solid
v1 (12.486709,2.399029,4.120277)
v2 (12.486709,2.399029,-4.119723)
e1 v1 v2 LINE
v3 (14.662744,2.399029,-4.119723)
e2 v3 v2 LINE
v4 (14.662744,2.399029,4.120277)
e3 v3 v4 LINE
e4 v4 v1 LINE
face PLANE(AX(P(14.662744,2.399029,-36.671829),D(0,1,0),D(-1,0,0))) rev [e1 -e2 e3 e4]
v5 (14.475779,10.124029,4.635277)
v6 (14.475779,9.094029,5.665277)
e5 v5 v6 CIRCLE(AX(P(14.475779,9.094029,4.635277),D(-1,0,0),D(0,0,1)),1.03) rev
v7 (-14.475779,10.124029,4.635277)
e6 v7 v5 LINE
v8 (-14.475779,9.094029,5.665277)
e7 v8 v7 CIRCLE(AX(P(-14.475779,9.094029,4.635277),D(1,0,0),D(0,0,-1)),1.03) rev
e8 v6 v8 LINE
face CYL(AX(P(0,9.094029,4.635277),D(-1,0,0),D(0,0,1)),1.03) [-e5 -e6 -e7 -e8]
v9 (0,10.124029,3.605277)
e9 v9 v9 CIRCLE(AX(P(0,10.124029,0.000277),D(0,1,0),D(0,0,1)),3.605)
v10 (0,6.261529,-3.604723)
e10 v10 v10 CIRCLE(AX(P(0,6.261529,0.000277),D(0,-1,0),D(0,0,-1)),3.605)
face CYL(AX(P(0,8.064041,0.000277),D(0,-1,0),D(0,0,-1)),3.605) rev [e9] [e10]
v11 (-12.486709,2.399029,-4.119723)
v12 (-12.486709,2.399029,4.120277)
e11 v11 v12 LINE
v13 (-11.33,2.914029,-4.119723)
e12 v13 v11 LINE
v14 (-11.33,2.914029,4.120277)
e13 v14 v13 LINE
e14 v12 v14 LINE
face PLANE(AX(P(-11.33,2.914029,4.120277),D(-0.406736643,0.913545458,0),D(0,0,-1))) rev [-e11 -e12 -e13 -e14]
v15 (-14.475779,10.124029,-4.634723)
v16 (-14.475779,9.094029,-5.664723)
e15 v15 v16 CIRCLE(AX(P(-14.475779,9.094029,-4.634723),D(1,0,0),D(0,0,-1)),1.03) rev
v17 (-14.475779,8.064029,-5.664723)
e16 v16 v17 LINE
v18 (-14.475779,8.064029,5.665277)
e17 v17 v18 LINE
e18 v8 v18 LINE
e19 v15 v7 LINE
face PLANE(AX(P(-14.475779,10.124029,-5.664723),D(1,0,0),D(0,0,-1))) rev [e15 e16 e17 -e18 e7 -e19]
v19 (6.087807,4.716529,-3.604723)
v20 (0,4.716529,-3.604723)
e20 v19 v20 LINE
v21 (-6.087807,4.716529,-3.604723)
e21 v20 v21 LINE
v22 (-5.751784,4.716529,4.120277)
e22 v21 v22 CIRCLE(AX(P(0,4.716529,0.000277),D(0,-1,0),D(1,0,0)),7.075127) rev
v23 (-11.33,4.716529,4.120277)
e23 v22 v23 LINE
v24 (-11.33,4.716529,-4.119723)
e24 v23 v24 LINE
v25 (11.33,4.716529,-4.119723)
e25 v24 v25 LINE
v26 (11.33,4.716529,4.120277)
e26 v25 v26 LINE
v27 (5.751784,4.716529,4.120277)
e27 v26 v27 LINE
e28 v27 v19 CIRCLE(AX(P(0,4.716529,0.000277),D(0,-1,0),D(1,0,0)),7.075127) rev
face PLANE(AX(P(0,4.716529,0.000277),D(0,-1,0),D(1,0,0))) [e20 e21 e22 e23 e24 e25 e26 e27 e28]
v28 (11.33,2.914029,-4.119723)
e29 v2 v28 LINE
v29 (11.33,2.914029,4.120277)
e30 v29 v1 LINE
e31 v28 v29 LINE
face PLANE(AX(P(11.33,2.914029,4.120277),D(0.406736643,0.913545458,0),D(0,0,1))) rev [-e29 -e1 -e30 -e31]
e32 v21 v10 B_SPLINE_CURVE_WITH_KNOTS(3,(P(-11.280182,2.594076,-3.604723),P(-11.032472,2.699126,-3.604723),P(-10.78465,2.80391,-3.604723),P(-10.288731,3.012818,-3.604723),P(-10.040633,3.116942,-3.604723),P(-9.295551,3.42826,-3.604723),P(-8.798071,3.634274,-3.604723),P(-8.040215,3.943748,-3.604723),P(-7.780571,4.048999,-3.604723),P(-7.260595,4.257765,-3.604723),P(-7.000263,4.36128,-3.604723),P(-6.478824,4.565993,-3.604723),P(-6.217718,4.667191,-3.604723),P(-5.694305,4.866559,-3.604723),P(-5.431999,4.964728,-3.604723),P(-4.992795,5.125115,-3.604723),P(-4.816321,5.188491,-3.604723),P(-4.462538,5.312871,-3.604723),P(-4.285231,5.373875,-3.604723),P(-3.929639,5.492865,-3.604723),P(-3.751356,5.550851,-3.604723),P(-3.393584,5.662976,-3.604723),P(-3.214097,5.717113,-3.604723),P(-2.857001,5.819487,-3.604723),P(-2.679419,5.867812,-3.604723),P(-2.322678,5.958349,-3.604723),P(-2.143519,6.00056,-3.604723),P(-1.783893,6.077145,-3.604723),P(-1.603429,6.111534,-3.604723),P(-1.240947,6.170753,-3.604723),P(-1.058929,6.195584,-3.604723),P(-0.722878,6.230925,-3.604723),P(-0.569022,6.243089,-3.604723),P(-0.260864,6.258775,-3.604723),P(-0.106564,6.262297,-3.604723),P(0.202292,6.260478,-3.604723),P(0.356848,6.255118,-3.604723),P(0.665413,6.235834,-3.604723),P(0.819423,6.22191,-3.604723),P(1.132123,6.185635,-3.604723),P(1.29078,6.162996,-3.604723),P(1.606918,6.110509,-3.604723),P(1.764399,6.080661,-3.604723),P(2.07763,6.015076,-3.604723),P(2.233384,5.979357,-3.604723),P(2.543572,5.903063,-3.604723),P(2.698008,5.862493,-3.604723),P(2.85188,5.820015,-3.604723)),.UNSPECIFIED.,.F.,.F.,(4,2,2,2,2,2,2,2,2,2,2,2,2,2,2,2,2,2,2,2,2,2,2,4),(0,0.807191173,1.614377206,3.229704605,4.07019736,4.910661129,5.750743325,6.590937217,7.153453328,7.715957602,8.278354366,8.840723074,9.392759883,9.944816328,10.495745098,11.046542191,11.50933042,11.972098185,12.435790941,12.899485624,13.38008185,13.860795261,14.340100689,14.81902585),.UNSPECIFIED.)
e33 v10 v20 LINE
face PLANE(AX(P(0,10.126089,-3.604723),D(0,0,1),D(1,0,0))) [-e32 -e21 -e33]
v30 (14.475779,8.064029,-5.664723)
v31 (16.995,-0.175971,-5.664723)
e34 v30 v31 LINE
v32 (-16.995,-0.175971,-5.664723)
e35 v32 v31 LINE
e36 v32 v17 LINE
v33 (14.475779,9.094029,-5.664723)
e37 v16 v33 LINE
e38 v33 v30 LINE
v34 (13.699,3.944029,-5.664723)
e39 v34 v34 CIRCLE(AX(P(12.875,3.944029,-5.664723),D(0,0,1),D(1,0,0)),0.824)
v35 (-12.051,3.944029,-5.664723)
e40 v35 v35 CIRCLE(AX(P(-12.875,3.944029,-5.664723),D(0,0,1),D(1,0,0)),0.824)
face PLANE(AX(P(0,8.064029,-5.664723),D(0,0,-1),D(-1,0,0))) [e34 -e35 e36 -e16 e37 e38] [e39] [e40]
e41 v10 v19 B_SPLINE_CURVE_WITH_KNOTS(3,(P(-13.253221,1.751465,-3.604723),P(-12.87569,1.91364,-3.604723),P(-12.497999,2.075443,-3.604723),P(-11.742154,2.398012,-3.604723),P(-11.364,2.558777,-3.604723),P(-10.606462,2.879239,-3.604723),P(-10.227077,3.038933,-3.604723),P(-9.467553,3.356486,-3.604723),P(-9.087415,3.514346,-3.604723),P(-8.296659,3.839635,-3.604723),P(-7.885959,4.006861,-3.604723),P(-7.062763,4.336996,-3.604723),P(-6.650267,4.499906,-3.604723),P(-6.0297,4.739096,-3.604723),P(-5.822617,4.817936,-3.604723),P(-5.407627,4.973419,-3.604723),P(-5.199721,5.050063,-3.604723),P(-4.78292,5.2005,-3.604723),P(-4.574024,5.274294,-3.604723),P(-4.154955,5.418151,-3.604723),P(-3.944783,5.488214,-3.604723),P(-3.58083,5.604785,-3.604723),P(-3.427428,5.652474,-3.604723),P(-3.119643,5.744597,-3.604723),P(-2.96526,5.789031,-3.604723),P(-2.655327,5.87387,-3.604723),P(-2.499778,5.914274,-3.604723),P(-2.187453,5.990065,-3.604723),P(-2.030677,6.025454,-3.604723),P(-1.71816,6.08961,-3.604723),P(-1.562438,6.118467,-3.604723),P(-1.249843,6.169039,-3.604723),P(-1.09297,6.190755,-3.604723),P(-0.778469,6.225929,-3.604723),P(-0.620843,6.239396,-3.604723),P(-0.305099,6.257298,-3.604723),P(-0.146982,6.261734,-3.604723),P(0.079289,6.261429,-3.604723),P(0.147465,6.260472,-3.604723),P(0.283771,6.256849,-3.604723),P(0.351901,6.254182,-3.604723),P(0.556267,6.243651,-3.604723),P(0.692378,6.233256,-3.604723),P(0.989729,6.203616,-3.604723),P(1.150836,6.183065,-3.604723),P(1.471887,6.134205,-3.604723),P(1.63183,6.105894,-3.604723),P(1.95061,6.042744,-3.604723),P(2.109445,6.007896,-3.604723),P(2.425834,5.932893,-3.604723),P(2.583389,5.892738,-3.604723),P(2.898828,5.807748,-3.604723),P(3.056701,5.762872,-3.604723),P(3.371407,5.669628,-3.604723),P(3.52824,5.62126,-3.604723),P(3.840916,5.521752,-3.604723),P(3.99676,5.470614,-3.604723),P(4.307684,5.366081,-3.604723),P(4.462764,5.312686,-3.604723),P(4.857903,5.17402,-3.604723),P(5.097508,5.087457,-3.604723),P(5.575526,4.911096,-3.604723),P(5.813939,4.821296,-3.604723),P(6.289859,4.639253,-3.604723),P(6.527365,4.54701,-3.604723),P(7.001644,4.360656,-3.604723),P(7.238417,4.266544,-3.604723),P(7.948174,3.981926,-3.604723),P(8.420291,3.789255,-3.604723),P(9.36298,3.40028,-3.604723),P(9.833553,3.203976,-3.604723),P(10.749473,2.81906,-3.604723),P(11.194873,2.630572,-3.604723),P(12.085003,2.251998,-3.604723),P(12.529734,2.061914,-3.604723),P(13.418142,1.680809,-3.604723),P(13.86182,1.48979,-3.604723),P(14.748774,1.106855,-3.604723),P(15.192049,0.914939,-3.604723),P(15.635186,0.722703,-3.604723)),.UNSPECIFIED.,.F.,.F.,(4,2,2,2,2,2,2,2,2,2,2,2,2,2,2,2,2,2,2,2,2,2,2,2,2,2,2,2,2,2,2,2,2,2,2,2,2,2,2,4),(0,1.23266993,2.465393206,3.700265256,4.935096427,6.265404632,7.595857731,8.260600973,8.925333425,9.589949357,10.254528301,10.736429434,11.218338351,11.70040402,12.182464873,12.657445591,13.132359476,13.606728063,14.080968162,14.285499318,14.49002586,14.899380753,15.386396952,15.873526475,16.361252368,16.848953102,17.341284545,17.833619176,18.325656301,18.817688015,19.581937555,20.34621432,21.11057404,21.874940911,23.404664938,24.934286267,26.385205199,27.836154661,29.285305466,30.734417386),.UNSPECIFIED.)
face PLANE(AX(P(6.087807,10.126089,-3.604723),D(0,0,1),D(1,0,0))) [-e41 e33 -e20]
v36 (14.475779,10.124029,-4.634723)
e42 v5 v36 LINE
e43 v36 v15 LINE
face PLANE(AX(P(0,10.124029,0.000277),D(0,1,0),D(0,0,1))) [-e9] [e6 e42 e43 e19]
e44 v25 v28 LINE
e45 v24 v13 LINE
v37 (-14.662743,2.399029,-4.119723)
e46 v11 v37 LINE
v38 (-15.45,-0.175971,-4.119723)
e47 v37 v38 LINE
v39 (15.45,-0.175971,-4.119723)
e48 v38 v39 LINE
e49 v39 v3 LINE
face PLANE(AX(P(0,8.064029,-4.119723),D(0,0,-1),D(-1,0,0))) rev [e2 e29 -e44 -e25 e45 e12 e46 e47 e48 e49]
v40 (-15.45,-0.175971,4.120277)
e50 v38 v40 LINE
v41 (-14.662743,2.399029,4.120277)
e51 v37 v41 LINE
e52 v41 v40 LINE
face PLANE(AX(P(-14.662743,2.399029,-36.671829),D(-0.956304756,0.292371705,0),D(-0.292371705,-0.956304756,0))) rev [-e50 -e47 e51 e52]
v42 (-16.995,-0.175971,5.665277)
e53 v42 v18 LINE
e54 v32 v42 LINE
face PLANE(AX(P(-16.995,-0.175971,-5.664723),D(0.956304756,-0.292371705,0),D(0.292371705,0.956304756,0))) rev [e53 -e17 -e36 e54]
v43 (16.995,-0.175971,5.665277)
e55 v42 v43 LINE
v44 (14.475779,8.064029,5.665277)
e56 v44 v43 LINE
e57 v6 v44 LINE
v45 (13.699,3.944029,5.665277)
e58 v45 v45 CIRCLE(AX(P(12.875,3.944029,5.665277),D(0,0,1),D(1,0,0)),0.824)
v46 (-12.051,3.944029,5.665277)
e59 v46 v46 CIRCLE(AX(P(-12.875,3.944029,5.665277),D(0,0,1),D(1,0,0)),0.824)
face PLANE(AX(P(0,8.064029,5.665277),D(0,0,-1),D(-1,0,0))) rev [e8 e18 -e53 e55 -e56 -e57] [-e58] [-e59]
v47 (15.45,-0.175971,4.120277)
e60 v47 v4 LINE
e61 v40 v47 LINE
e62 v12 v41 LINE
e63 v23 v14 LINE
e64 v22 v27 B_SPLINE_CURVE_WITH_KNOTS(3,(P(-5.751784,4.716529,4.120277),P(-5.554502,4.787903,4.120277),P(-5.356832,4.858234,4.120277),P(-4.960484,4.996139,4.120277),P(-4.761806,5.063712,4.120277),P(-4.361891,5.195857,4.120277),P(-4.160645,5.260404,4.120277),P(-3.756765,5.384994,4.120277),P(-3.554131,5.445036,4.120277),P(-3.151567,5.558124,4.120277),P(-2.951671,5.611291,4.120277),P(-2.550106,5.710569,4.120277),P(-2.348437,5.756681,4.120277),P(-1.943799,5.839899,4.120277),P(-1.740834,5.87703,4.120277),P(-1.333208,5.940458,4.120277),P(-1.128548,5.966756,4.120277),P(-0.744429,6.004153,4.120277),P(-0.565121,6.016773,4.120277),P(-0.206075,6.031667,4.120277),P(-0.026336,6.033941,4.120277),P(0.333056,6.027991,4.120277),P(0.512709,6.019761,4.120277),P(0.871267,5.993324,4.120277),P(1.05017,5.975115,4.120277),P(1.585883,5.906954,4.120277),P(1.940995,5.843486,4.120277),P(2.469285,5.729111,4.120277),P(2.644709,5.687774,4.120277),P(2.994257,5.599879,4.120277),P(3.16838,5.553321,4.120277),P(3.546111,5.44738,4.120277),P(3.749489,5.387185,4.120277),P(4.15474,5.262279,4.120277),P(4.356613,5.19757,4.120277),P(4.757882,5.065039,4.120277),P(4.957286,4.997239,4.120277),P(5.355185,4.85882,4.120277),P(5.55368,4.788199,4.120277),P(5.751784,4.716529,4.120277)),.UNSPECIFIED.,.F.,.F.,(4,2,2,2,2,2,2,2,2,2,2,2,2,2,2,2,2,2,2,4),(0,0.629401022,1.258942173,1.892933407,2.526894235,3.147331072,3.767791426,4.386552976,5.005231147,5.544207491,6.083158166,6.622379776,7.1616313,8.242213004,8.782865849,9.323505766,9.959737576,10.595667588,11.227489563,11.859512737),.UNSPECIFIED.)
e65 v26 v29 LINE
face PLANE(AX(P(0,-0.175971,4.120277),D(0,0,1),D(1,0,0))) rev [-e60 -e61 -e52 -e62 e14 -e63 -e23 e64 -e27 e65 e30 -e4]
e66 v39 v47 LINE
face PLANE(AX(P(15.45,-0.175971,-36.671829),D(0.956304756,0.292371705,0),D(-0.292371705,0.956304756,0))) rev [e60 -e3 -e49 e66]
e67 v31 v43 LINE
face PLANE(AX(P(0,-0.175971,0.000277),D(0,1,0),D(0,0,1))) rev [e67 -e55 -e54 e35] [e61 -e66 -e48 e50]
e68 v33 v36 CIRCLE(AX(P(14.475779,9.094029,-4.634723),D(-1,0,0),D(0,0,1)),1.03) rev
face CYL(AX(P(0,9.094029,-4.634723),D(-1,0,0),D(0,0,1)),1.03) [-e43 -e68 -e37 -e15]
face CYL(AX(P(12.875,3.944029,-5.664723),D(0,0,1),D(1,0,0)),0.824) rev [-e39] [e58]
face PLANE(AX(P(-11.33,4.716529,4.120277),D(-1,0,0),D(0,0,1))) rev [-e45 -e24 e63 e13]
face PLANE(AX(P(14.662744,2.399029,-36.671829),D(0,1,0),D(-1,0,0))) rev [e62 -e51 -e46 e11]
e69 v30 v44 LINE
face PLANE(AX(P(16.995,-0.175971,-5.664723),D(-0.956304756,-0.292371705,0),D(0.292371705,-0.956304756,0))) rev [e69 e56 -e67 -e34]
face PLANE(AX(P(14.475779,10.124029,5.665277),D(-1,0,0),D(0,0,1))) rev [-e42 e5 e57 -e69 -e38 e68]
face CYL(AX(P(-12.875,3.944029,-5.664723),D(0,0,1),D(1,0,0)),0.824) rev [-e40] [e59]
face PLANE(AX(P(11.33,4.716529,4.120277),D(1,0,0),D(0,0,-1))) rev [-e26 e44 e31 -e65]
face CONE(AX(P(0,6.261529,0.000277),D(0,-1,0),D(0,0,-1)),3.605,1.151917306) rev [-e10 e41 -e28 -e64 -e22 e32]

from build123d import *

# Parameters (mm, degrees)
SKETCH1_W                      = 33
SKETCH1_H                      = 11
SKETCH1_W_2                    = 30
SKETCH1_H_2                    = 8
BOSS_EXTRUDE1_DEPTH            = 8
SKETCH3_R                      = 0.8
CUT_EXTRUDE3_DEPTH             = 22.38340478
CUT_EXTRUDE5_REACH             = 21.144
SKETCH5_R                      = 3.5
CUT_EXTRUDE5_DIRECTION_2_DEPTH = 20.144189719
CUT_EXTRUDE4_DEPTH             = 22.38340478
CUT_EXTRUDE9_START             = -1.5
CUT_EXTRUDE9_DEPTH             = 8
SKETCH9_W                      = 22
SKETCH9_H                      = 8
CUT_EXTRUDE8_DEPTH             = 2.25
BOSS_EXTRUDE8_START            = 2
SKETCH12_W                     = 28.108309096
SKETCH12_H                     = 11
SKETCH12_R                     = 3.5
BOSS_EXTRUDE8_DEPTH            = 2
FILLET1_R                      = 1
CHAMFER1_SIZE                  = 1.5
CHAMFER1_SIZE_2                = 3.369055161
CHAMFER2_SIZE                  = 0.5
CHAMFER2_SIZE2                 = 1.123018387
CHAMFER3_SIZE                  = 0.5
CHAMFER3_SIZE2                 = 1.123018387
BOSS_EXTRUDE9_REACH            = 20.168
HEAT_SHRINK_OFFSET_SCALE_SCALE = 1.03


with BuildPart() as part:
    # Sketch1 → Boss-Extrude1 (new body)
    # profile 1 of 2: a face of its own
    with BuildSketch(Plane(origin=(0, 0, 0), x_dir=(1, 0, 0), z_dir=(0, 1, 0))):
        Rectangle(SKETCH1_W, SKETCH1_H)
        Rectangle(SKETCH1_W_2, SKETCH1_H_2, mode=Mode.SUBTRACT)
    # profile 2 of 2: a face of its own
    with BuildSketch(Plane(origin=(0, 0, 0), x_dir=(1, 0, 0), z_dir=(0, 1, 0))):
        Rectangle(SKETCH1_W_2, SKETCH1_H_2)
    extrude(amount=BOSS_EXTRUDE1_DEPTH)

    # Sketch3 → Cut-Extrude3 (cut, through all)
    with BuildSketch(Plane.XY.offset(5.5)):
        with Locations((-12.5, 4)):
            Circle(SKETCH3_R)
        with Locations((12.5, 4)):
            Circle(SKETCH3_R)
    extrude(amount=-CUT_EXTRUDE3_DEPTH, mode=Mode.SUBTRACT)

    # Sketch5 → Cut-Extrude5 (cut, up to next)
    with BuildSketch(Plane(origin=(0, 8, 0), x_dir=(1, 0, 0), z_dir=(0, 1, 0)), mode=Mode.PRIVATE) as cut_extrude5_sk1:
        with Locations(Location((0, 0, 0), (0, 0, 90))):
            Circle(SKETCH5_R)
    cut_extrude5_tool1 = extrude(cut_extrude5_sk1.sketch, amount=-CUT_EXTRUDE5_REACH, mode=Mode.PRIVATE) & part.part
    add(cut_extrude5_tool1.solids().sort_by_distance((0, 8, 0))[0], mode=Mode.SUBTRACT)

    # Sketch5 → Cut-Extrude5 direction 2 (cut)
    with BuildSketch(Plane(origin=(0, 8, 0), x_dir=(1, 0, 0), z_dir=(0, 1, 0))):
        with Locations(Location((0, 0, 0), (0, 0, 90))):
            Circle(SKETCH5_R)
    extrude(amount=CUT_EXTRUDE5_DIRECTION_2_DEPTH, mode=Mode.SUBTRACT)

    # Sketch4 → Cut-Extrude4 (cut, through all)
    with BuildSketch(Plane.XY.offset(5.5)):
        Polygon((-16.5, 0), (-14.054154548, 8), (-16.5, 8), align=None)
        Polygon((16.5, 0), (14.054154548, 8), (16.5, 8), align=None)
    extrude(amount=-CUT_EXTRUDE4_DEPTH, mode=Mode.SUBTRACT)

    # Sketch14 → Cut-Extrude9 (cut)
    with BuildSketch(Plane.XY.offset(5.5).offset(CUT_EXTRUDE9_START)):
        Polygon((-15, 0), (15, 0), (14.235673296, 2.5), (-14.235673296, 2.5), align=None)
    extrude(amount=-CUT_EXTRUDE9_DEPTH, mode=Mode.SUBTRACT)

    # Sketch9 → Cut-Extrude8 (cut)
    with BuildSketch(Plane.XZ.offset(-2.5)):
        Rectangle(SKETCH9_W, SKETCH9_H)
    extrude(amount=-CUT_EXTRUDE8_DEPTH, mode=Mode.SUBTRACT)

    # Sketch12 → Boss-Extrude8 (add)
    with BuildSketch(Plane(origin=(0, 8, 0), x_dir=(1, 0, 0), z_dir=(0, 1, 0)).offset(BOSS_EXTRUDE8_START)):
        Rectangle(SKETCH12_W, SKETCH12_H)
        with Locations(Location((0, 0, 0), (0, 0, 90))):
            Circle(SKETCH12_R, mode=Mode.SUBTRACT)
    extrude(amount=-BOSS_EXTRUDE8_DEPTH)

    # Fillet1
    fillet1_edges = [part.edges().sort_by_distance(p)[0] for p in [
        (0, 10, 5.5),
        (0, 10, -5.5),
    ]]
    fillet(fillet1_edges, radius=FILLET1_R)

    # Chamfer1
    # the kernel refuses this chamfer: 3.369055161, 1.5 mm, written as the material it takes off along each edge
    with BuildSketch(Plane(origin=(0, 4.75, 0), x_dir=(0, 0, -1), z_dir=(1, 0, 0))) as chamfer1_piece_1_section:
        Polygon((3.5, CHAMFER1_SIZE), (3.5 + CHAMFER1_SIZE_2, 0), (3.5, 0), align=None)
    chamfer1_piece_1 = revolve(axis=Axis((0, 4.75, 0), (0, 1, 0)), mode=Mode.PRIVATE)
    chamfer1_piece_1 = split(chamfer1_piece_1, bisect_by=Plane(origin=(-3.432540166, 6.000877118, 4), z_dir=(0, 0, -1)), keep=Keep.TOP, mode=Mode.PRIVATE)
    chamfer1_piece_1 = split(chamfer1_piece_1, bisect_by=Plane(origin=(-3.432540166, 6.000877118, -4), z_dir=(0, 0, 1)), keep=Keep.TOP, mode=Mode.PRIVATE)
    add(chamfer1_piece_1, mode=Mode.SUBTRACT)

    # Chamfer2
    chamfer2_edges = [part.edges().sort_by_distance(p)[0] for p in [
        (-11, 2.5, 0),
    ]]
    chamfer2_side = [part.faces().sort_by_distance(p)[0] for p in [
        (-11, 3.625, 0),
    ]]
    chamfer(chamfer2_edges, length=CHAMFER2_SIZE, length2=CHAMFER2_SIZE2, reference=chamfer2_side[0])

    # Chamfer3
    chamfer3_edges = [part.edges().sort_by_distance(p)[0] for p in [
        (11, 2.5, 0),
    ]]
    chamfer3_side = [part.faces().sort_by_distance(p)[0] for p in [
        (11, 3.625, 0),
    ]]
    chamfer(chamfer3_edges, length=CHAMFER3_SIZE, length2=CHAMFER3_SIZE2, reference=chamfer3_side[0])

    # Sketch17 → Boss-Extrude9 (add, up to next)
    with BuildSketch(Plane.XZ.offset(-4.75), mode=Mode.PRIVATE) as boss_extrude9_sk1:
        Polygon((5.910492264, -3.5), (0, -3.5), (-5.910492264, -3.5), (-5.910492264, -4), (5.910492264, -4), align=None)
    boss_extrude9_tool1 = extrude(boss_extrude9_sk1.sketch, amount=-BOSS_EXTRUDE9_REACH, mode=Mode.PRIVATE) - part.part
    add(boss_extrude9_tool1.solids().sort_by_distance((0, 4.75, -3.75))[0])


with BuildPart() as part_1:
    # Heat shrink offset scale: scaled about (0, 5.8657217, -0.009275667)
    add(part.part.scale(HEAT_SHRINK_OFFSET_SCALE_SCALE).moved(Location((0, -0.175971651, 0.00027827))))


solid = part_1.part
